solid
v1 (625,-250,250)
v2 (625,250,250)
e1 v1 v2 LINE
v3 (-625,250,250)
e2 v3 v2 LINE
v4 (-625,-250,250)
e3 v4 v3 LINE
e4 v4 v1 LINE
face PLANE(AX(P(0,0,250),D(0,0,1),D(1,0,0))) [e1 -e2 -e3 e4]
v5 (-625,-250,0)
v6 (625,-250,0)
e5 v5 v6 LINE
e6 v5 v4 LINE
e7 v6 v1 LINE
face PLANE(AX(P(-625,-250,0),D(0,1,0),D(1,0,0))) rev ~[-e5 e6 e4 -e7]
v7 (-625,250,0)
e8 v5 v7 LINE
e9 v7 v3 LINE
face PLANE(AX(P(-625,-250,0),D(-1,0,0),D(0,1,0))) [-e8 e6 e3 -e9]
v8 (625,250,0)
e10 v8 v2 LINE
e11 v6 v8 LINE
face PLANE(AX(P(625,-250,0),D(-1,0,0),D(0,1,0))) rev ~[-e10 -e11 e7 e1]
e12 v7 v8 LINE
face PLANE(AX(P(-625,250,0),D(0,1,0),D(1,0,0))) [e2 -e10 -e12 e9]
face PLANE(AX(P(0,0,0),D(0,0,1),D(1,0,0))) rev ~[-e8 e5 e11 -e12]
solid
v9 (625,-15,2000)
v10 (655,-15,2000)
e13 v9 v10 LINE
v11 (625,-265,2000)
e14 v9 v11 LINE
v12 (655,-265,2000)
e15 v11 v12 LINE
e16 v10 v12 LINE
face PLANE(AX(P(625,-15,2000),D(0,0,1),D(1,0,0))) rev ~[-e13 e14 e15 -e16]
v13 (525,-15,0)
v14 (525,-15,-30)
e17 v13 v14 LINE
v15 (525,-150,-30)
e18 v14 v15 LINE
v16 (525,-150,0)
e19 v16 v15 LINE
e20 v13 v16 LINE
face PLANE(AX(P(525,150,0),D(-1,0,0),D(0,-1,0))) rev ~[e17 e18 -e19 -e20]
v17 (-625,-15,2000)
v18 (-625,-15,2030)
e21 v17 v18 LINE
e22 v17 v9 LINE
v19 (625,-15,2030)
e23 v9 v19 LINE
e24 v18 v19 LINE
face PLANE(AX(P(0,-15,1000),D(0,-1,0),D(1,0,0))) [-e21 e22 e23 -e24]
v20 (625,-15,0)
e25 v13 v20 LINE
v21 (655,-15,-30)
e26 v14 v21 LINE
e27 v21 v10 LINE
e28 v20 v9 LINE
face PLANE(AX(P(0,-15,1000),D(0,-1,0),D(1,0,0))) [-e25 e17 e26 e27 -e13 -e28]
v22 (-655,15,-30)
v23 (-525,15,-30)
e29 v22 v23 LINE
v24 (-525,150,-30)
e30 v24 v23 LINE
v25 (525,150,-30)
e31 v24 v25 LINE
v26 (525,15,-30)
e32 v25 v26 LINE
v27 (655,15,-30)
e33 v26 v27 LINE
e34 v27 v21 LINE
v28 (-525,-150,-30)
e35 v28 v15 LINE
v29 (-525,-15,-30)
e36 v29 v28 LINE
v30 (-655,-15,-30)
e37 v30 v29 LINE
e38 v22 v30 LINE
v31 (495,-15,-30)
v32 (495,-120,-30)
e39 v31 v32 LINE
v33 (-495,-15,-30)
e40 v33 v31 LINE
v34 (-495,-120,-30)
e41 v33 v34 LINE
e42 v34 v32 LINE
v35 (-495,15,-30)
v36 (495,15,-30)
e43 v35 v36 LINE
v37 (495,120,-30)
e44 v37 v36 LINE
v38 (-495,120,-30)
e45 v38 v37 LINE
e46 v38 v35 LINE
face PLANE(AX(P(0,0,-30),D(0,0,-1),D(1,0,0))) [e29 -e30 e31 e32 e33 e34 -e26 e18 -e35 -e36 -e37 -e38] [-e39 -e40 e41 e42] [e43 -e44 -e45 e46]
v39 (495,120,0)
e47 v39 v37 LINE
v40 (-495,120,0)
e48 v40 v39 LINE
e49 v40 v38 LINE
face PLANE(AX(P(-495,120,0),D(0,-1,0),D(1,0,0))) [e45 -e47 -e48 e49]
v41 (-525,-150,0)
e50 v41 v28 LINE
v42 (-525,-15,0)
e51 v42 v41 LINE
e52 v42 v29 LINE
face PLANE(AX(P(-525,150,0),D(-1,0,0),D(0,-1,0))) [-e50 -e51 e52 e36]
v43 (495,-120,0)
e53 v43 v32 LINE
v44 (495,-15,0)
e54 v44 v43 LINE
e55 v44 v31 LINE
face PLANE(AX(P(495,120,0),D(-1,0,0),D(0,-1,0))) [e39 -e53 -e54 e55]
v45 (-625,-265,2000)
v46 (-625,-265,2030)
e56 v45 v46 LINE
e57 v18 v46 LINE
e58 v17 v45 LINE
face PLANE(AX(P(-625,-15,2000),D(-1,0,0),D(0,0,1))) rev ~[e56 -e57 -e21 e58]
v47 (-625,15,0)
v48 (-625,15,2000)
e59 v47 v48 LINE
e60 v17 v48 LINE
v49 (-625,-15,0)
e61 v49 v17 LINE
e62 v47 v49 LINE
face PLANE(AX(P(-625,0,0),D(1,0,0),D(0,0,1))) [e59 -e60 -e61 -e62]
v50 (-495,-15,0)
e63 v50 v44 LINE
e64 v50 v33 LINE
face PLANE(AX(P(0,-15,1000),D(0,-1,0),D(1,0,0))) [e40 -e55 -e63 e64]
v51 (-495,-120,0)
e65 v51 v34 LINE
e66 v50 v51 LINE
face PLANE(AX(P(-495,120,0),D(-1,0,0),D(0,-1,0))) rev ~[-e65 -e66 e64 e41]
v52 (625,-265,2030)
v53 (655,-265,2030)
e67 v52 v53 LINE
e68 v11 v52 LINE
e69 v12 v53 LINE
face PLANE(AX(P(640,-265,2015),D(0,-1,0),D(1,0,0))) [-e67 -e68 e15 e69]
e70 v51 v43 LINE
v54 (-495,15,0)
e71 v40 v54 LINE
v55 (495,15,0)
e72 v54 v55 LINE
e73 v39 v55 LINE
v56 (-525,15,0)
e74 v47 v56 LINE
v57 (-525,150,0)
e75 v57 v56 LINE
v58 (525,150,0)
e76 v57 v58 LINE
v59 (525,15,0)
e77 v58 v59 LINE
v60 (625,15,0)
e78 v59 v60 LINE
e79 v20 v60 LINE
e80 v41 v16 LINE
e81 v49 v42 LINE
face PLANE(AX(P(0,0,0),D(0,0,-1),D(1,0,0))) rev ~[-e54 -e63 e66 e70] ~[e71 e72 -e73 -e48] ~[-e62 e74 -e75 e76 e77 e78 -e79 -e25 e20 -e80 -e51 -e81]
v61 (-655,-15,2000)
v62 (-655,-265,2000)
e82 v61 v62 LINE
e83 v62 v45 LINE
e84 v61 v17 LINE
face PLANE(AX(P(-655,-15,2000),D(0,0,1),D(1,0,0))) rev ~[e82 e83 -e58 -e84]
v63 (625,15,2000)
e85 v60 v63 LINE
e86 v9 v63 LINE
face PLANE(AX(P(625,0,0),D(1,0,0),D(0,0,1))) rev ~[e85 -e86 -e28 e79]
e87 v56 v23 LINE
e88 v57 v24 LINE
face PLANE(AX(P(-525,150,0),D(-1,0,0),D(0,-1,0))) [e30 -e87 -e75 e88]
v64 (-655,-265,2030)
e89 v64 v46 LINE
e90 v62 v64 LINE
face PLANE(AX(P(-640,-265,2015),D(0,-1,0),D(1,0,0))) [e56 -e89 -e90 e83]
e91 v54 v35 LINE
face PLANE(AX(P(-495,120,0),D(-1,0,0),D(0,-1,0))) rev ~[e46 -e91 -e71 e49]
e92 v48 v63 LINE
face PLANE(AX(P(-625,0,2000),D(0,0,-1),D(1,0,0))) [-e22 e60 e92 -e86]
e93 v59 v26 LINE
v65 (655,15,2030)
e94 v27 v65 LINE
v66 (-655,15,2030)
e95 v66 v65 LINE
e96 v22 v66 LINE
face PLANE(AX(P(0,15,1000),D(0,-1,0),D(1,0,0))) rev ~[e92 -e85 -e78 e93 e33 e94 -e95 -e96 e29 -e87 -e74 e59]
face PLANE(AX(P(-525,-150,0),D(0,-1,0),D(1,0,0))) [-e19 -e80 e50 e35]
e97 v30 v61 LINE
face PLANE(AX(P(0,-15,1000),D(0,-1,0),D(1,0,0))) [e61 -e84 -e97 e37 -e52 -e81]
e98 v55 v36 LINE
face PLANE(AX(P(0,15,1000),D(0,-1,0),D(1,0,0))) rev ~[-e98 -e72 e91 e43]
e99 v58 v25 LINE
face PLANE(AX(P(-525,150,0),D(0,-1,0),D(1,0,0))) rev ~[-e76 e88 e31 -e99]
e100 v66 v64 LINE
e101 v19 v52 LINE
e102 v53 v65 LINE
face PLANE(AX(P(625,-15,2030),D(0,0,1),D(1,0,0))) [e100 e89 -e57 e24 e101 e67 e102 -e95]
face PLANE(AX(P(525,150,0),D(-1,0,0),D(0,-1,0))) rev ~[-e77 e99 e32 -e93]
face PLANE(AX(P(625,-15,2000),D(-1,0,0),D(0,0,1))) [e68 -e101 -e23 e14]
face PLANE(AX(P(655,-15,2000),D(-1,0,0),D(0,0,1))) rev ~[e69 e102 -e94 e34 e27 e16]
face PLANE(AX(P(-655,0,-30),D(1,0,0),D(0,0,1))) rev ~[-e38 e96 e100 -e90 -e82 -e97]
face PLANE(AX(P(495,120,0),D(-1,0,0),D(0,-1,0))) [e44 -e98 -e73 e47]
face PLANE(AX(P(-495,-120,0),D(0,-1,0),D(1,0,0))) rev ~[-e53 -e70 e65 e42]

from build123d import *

# Parameters (mm, degrees)
F0_W     = 1250
F0_H     = 500
F1_DEPTH = 250
F2_W     = 1310
F2_H     = 2060
F2_W_2   = 1250
F2_H_2   = 2000
F3_DEPTH = 15
F4_W     = 1050
F4_H     = 300
F4_W_2   = 990
F4_H_2   = 240
F5_DEPTH = 30
F6_W     = 30
F6_H     = 30
F7_DEPTH = 250


# Not quite as in the source:
# - a feature of the source that left no trace in its solid (it failed there, or was rolled back) is left out


with BuildPart() as f1:
    # F0 (on Top) → F1 (new body)
    with BuildSketch(Plane.XY):
        Rectangle(F0_W, F0_H)
    extrude(amount=F1_DEPTH)


with BuildPart() as f3:
    # F2 (on Front) → F3 (new body, symmetric)
    with BuildSketch(Plane.XZ):
        with Locations((0, 1000)):
            Rectangle(F2_W, F2_H)
        with Locations((0, 1000)):
            Rectangle(F2_W_2, F2_H_2, mode=Mode.SUBTRACT)
    extrude(amount=F3_DEPTH, both=True)

    # F4 (on face) → F5 (join)
    with BuildSketch(Plane(origin=(0, 0, 0), x_dir=(1, 0, 0), z_dir=(0, 0, -1))):
        Rectangle(F4_W, F4_H)
        Rectangle(F4_W_2, F4_H_2, mode=Mode.SUBTRACT)
    extrude(amount=F5_DEPTH)

    # F6 (on face) → F7 (join)
    with BuildSketch(Plane.XZ.offset(15)):
        with Locations((640, 2015)):
            Rectangle(F6_W, F6_H)
        with Locations((-640, 2015)):
            Rectangle(F6_W, F6_H)
    extrude(amount=F7_DEPTH)


solid = Compound([f1.part, f3.part])
